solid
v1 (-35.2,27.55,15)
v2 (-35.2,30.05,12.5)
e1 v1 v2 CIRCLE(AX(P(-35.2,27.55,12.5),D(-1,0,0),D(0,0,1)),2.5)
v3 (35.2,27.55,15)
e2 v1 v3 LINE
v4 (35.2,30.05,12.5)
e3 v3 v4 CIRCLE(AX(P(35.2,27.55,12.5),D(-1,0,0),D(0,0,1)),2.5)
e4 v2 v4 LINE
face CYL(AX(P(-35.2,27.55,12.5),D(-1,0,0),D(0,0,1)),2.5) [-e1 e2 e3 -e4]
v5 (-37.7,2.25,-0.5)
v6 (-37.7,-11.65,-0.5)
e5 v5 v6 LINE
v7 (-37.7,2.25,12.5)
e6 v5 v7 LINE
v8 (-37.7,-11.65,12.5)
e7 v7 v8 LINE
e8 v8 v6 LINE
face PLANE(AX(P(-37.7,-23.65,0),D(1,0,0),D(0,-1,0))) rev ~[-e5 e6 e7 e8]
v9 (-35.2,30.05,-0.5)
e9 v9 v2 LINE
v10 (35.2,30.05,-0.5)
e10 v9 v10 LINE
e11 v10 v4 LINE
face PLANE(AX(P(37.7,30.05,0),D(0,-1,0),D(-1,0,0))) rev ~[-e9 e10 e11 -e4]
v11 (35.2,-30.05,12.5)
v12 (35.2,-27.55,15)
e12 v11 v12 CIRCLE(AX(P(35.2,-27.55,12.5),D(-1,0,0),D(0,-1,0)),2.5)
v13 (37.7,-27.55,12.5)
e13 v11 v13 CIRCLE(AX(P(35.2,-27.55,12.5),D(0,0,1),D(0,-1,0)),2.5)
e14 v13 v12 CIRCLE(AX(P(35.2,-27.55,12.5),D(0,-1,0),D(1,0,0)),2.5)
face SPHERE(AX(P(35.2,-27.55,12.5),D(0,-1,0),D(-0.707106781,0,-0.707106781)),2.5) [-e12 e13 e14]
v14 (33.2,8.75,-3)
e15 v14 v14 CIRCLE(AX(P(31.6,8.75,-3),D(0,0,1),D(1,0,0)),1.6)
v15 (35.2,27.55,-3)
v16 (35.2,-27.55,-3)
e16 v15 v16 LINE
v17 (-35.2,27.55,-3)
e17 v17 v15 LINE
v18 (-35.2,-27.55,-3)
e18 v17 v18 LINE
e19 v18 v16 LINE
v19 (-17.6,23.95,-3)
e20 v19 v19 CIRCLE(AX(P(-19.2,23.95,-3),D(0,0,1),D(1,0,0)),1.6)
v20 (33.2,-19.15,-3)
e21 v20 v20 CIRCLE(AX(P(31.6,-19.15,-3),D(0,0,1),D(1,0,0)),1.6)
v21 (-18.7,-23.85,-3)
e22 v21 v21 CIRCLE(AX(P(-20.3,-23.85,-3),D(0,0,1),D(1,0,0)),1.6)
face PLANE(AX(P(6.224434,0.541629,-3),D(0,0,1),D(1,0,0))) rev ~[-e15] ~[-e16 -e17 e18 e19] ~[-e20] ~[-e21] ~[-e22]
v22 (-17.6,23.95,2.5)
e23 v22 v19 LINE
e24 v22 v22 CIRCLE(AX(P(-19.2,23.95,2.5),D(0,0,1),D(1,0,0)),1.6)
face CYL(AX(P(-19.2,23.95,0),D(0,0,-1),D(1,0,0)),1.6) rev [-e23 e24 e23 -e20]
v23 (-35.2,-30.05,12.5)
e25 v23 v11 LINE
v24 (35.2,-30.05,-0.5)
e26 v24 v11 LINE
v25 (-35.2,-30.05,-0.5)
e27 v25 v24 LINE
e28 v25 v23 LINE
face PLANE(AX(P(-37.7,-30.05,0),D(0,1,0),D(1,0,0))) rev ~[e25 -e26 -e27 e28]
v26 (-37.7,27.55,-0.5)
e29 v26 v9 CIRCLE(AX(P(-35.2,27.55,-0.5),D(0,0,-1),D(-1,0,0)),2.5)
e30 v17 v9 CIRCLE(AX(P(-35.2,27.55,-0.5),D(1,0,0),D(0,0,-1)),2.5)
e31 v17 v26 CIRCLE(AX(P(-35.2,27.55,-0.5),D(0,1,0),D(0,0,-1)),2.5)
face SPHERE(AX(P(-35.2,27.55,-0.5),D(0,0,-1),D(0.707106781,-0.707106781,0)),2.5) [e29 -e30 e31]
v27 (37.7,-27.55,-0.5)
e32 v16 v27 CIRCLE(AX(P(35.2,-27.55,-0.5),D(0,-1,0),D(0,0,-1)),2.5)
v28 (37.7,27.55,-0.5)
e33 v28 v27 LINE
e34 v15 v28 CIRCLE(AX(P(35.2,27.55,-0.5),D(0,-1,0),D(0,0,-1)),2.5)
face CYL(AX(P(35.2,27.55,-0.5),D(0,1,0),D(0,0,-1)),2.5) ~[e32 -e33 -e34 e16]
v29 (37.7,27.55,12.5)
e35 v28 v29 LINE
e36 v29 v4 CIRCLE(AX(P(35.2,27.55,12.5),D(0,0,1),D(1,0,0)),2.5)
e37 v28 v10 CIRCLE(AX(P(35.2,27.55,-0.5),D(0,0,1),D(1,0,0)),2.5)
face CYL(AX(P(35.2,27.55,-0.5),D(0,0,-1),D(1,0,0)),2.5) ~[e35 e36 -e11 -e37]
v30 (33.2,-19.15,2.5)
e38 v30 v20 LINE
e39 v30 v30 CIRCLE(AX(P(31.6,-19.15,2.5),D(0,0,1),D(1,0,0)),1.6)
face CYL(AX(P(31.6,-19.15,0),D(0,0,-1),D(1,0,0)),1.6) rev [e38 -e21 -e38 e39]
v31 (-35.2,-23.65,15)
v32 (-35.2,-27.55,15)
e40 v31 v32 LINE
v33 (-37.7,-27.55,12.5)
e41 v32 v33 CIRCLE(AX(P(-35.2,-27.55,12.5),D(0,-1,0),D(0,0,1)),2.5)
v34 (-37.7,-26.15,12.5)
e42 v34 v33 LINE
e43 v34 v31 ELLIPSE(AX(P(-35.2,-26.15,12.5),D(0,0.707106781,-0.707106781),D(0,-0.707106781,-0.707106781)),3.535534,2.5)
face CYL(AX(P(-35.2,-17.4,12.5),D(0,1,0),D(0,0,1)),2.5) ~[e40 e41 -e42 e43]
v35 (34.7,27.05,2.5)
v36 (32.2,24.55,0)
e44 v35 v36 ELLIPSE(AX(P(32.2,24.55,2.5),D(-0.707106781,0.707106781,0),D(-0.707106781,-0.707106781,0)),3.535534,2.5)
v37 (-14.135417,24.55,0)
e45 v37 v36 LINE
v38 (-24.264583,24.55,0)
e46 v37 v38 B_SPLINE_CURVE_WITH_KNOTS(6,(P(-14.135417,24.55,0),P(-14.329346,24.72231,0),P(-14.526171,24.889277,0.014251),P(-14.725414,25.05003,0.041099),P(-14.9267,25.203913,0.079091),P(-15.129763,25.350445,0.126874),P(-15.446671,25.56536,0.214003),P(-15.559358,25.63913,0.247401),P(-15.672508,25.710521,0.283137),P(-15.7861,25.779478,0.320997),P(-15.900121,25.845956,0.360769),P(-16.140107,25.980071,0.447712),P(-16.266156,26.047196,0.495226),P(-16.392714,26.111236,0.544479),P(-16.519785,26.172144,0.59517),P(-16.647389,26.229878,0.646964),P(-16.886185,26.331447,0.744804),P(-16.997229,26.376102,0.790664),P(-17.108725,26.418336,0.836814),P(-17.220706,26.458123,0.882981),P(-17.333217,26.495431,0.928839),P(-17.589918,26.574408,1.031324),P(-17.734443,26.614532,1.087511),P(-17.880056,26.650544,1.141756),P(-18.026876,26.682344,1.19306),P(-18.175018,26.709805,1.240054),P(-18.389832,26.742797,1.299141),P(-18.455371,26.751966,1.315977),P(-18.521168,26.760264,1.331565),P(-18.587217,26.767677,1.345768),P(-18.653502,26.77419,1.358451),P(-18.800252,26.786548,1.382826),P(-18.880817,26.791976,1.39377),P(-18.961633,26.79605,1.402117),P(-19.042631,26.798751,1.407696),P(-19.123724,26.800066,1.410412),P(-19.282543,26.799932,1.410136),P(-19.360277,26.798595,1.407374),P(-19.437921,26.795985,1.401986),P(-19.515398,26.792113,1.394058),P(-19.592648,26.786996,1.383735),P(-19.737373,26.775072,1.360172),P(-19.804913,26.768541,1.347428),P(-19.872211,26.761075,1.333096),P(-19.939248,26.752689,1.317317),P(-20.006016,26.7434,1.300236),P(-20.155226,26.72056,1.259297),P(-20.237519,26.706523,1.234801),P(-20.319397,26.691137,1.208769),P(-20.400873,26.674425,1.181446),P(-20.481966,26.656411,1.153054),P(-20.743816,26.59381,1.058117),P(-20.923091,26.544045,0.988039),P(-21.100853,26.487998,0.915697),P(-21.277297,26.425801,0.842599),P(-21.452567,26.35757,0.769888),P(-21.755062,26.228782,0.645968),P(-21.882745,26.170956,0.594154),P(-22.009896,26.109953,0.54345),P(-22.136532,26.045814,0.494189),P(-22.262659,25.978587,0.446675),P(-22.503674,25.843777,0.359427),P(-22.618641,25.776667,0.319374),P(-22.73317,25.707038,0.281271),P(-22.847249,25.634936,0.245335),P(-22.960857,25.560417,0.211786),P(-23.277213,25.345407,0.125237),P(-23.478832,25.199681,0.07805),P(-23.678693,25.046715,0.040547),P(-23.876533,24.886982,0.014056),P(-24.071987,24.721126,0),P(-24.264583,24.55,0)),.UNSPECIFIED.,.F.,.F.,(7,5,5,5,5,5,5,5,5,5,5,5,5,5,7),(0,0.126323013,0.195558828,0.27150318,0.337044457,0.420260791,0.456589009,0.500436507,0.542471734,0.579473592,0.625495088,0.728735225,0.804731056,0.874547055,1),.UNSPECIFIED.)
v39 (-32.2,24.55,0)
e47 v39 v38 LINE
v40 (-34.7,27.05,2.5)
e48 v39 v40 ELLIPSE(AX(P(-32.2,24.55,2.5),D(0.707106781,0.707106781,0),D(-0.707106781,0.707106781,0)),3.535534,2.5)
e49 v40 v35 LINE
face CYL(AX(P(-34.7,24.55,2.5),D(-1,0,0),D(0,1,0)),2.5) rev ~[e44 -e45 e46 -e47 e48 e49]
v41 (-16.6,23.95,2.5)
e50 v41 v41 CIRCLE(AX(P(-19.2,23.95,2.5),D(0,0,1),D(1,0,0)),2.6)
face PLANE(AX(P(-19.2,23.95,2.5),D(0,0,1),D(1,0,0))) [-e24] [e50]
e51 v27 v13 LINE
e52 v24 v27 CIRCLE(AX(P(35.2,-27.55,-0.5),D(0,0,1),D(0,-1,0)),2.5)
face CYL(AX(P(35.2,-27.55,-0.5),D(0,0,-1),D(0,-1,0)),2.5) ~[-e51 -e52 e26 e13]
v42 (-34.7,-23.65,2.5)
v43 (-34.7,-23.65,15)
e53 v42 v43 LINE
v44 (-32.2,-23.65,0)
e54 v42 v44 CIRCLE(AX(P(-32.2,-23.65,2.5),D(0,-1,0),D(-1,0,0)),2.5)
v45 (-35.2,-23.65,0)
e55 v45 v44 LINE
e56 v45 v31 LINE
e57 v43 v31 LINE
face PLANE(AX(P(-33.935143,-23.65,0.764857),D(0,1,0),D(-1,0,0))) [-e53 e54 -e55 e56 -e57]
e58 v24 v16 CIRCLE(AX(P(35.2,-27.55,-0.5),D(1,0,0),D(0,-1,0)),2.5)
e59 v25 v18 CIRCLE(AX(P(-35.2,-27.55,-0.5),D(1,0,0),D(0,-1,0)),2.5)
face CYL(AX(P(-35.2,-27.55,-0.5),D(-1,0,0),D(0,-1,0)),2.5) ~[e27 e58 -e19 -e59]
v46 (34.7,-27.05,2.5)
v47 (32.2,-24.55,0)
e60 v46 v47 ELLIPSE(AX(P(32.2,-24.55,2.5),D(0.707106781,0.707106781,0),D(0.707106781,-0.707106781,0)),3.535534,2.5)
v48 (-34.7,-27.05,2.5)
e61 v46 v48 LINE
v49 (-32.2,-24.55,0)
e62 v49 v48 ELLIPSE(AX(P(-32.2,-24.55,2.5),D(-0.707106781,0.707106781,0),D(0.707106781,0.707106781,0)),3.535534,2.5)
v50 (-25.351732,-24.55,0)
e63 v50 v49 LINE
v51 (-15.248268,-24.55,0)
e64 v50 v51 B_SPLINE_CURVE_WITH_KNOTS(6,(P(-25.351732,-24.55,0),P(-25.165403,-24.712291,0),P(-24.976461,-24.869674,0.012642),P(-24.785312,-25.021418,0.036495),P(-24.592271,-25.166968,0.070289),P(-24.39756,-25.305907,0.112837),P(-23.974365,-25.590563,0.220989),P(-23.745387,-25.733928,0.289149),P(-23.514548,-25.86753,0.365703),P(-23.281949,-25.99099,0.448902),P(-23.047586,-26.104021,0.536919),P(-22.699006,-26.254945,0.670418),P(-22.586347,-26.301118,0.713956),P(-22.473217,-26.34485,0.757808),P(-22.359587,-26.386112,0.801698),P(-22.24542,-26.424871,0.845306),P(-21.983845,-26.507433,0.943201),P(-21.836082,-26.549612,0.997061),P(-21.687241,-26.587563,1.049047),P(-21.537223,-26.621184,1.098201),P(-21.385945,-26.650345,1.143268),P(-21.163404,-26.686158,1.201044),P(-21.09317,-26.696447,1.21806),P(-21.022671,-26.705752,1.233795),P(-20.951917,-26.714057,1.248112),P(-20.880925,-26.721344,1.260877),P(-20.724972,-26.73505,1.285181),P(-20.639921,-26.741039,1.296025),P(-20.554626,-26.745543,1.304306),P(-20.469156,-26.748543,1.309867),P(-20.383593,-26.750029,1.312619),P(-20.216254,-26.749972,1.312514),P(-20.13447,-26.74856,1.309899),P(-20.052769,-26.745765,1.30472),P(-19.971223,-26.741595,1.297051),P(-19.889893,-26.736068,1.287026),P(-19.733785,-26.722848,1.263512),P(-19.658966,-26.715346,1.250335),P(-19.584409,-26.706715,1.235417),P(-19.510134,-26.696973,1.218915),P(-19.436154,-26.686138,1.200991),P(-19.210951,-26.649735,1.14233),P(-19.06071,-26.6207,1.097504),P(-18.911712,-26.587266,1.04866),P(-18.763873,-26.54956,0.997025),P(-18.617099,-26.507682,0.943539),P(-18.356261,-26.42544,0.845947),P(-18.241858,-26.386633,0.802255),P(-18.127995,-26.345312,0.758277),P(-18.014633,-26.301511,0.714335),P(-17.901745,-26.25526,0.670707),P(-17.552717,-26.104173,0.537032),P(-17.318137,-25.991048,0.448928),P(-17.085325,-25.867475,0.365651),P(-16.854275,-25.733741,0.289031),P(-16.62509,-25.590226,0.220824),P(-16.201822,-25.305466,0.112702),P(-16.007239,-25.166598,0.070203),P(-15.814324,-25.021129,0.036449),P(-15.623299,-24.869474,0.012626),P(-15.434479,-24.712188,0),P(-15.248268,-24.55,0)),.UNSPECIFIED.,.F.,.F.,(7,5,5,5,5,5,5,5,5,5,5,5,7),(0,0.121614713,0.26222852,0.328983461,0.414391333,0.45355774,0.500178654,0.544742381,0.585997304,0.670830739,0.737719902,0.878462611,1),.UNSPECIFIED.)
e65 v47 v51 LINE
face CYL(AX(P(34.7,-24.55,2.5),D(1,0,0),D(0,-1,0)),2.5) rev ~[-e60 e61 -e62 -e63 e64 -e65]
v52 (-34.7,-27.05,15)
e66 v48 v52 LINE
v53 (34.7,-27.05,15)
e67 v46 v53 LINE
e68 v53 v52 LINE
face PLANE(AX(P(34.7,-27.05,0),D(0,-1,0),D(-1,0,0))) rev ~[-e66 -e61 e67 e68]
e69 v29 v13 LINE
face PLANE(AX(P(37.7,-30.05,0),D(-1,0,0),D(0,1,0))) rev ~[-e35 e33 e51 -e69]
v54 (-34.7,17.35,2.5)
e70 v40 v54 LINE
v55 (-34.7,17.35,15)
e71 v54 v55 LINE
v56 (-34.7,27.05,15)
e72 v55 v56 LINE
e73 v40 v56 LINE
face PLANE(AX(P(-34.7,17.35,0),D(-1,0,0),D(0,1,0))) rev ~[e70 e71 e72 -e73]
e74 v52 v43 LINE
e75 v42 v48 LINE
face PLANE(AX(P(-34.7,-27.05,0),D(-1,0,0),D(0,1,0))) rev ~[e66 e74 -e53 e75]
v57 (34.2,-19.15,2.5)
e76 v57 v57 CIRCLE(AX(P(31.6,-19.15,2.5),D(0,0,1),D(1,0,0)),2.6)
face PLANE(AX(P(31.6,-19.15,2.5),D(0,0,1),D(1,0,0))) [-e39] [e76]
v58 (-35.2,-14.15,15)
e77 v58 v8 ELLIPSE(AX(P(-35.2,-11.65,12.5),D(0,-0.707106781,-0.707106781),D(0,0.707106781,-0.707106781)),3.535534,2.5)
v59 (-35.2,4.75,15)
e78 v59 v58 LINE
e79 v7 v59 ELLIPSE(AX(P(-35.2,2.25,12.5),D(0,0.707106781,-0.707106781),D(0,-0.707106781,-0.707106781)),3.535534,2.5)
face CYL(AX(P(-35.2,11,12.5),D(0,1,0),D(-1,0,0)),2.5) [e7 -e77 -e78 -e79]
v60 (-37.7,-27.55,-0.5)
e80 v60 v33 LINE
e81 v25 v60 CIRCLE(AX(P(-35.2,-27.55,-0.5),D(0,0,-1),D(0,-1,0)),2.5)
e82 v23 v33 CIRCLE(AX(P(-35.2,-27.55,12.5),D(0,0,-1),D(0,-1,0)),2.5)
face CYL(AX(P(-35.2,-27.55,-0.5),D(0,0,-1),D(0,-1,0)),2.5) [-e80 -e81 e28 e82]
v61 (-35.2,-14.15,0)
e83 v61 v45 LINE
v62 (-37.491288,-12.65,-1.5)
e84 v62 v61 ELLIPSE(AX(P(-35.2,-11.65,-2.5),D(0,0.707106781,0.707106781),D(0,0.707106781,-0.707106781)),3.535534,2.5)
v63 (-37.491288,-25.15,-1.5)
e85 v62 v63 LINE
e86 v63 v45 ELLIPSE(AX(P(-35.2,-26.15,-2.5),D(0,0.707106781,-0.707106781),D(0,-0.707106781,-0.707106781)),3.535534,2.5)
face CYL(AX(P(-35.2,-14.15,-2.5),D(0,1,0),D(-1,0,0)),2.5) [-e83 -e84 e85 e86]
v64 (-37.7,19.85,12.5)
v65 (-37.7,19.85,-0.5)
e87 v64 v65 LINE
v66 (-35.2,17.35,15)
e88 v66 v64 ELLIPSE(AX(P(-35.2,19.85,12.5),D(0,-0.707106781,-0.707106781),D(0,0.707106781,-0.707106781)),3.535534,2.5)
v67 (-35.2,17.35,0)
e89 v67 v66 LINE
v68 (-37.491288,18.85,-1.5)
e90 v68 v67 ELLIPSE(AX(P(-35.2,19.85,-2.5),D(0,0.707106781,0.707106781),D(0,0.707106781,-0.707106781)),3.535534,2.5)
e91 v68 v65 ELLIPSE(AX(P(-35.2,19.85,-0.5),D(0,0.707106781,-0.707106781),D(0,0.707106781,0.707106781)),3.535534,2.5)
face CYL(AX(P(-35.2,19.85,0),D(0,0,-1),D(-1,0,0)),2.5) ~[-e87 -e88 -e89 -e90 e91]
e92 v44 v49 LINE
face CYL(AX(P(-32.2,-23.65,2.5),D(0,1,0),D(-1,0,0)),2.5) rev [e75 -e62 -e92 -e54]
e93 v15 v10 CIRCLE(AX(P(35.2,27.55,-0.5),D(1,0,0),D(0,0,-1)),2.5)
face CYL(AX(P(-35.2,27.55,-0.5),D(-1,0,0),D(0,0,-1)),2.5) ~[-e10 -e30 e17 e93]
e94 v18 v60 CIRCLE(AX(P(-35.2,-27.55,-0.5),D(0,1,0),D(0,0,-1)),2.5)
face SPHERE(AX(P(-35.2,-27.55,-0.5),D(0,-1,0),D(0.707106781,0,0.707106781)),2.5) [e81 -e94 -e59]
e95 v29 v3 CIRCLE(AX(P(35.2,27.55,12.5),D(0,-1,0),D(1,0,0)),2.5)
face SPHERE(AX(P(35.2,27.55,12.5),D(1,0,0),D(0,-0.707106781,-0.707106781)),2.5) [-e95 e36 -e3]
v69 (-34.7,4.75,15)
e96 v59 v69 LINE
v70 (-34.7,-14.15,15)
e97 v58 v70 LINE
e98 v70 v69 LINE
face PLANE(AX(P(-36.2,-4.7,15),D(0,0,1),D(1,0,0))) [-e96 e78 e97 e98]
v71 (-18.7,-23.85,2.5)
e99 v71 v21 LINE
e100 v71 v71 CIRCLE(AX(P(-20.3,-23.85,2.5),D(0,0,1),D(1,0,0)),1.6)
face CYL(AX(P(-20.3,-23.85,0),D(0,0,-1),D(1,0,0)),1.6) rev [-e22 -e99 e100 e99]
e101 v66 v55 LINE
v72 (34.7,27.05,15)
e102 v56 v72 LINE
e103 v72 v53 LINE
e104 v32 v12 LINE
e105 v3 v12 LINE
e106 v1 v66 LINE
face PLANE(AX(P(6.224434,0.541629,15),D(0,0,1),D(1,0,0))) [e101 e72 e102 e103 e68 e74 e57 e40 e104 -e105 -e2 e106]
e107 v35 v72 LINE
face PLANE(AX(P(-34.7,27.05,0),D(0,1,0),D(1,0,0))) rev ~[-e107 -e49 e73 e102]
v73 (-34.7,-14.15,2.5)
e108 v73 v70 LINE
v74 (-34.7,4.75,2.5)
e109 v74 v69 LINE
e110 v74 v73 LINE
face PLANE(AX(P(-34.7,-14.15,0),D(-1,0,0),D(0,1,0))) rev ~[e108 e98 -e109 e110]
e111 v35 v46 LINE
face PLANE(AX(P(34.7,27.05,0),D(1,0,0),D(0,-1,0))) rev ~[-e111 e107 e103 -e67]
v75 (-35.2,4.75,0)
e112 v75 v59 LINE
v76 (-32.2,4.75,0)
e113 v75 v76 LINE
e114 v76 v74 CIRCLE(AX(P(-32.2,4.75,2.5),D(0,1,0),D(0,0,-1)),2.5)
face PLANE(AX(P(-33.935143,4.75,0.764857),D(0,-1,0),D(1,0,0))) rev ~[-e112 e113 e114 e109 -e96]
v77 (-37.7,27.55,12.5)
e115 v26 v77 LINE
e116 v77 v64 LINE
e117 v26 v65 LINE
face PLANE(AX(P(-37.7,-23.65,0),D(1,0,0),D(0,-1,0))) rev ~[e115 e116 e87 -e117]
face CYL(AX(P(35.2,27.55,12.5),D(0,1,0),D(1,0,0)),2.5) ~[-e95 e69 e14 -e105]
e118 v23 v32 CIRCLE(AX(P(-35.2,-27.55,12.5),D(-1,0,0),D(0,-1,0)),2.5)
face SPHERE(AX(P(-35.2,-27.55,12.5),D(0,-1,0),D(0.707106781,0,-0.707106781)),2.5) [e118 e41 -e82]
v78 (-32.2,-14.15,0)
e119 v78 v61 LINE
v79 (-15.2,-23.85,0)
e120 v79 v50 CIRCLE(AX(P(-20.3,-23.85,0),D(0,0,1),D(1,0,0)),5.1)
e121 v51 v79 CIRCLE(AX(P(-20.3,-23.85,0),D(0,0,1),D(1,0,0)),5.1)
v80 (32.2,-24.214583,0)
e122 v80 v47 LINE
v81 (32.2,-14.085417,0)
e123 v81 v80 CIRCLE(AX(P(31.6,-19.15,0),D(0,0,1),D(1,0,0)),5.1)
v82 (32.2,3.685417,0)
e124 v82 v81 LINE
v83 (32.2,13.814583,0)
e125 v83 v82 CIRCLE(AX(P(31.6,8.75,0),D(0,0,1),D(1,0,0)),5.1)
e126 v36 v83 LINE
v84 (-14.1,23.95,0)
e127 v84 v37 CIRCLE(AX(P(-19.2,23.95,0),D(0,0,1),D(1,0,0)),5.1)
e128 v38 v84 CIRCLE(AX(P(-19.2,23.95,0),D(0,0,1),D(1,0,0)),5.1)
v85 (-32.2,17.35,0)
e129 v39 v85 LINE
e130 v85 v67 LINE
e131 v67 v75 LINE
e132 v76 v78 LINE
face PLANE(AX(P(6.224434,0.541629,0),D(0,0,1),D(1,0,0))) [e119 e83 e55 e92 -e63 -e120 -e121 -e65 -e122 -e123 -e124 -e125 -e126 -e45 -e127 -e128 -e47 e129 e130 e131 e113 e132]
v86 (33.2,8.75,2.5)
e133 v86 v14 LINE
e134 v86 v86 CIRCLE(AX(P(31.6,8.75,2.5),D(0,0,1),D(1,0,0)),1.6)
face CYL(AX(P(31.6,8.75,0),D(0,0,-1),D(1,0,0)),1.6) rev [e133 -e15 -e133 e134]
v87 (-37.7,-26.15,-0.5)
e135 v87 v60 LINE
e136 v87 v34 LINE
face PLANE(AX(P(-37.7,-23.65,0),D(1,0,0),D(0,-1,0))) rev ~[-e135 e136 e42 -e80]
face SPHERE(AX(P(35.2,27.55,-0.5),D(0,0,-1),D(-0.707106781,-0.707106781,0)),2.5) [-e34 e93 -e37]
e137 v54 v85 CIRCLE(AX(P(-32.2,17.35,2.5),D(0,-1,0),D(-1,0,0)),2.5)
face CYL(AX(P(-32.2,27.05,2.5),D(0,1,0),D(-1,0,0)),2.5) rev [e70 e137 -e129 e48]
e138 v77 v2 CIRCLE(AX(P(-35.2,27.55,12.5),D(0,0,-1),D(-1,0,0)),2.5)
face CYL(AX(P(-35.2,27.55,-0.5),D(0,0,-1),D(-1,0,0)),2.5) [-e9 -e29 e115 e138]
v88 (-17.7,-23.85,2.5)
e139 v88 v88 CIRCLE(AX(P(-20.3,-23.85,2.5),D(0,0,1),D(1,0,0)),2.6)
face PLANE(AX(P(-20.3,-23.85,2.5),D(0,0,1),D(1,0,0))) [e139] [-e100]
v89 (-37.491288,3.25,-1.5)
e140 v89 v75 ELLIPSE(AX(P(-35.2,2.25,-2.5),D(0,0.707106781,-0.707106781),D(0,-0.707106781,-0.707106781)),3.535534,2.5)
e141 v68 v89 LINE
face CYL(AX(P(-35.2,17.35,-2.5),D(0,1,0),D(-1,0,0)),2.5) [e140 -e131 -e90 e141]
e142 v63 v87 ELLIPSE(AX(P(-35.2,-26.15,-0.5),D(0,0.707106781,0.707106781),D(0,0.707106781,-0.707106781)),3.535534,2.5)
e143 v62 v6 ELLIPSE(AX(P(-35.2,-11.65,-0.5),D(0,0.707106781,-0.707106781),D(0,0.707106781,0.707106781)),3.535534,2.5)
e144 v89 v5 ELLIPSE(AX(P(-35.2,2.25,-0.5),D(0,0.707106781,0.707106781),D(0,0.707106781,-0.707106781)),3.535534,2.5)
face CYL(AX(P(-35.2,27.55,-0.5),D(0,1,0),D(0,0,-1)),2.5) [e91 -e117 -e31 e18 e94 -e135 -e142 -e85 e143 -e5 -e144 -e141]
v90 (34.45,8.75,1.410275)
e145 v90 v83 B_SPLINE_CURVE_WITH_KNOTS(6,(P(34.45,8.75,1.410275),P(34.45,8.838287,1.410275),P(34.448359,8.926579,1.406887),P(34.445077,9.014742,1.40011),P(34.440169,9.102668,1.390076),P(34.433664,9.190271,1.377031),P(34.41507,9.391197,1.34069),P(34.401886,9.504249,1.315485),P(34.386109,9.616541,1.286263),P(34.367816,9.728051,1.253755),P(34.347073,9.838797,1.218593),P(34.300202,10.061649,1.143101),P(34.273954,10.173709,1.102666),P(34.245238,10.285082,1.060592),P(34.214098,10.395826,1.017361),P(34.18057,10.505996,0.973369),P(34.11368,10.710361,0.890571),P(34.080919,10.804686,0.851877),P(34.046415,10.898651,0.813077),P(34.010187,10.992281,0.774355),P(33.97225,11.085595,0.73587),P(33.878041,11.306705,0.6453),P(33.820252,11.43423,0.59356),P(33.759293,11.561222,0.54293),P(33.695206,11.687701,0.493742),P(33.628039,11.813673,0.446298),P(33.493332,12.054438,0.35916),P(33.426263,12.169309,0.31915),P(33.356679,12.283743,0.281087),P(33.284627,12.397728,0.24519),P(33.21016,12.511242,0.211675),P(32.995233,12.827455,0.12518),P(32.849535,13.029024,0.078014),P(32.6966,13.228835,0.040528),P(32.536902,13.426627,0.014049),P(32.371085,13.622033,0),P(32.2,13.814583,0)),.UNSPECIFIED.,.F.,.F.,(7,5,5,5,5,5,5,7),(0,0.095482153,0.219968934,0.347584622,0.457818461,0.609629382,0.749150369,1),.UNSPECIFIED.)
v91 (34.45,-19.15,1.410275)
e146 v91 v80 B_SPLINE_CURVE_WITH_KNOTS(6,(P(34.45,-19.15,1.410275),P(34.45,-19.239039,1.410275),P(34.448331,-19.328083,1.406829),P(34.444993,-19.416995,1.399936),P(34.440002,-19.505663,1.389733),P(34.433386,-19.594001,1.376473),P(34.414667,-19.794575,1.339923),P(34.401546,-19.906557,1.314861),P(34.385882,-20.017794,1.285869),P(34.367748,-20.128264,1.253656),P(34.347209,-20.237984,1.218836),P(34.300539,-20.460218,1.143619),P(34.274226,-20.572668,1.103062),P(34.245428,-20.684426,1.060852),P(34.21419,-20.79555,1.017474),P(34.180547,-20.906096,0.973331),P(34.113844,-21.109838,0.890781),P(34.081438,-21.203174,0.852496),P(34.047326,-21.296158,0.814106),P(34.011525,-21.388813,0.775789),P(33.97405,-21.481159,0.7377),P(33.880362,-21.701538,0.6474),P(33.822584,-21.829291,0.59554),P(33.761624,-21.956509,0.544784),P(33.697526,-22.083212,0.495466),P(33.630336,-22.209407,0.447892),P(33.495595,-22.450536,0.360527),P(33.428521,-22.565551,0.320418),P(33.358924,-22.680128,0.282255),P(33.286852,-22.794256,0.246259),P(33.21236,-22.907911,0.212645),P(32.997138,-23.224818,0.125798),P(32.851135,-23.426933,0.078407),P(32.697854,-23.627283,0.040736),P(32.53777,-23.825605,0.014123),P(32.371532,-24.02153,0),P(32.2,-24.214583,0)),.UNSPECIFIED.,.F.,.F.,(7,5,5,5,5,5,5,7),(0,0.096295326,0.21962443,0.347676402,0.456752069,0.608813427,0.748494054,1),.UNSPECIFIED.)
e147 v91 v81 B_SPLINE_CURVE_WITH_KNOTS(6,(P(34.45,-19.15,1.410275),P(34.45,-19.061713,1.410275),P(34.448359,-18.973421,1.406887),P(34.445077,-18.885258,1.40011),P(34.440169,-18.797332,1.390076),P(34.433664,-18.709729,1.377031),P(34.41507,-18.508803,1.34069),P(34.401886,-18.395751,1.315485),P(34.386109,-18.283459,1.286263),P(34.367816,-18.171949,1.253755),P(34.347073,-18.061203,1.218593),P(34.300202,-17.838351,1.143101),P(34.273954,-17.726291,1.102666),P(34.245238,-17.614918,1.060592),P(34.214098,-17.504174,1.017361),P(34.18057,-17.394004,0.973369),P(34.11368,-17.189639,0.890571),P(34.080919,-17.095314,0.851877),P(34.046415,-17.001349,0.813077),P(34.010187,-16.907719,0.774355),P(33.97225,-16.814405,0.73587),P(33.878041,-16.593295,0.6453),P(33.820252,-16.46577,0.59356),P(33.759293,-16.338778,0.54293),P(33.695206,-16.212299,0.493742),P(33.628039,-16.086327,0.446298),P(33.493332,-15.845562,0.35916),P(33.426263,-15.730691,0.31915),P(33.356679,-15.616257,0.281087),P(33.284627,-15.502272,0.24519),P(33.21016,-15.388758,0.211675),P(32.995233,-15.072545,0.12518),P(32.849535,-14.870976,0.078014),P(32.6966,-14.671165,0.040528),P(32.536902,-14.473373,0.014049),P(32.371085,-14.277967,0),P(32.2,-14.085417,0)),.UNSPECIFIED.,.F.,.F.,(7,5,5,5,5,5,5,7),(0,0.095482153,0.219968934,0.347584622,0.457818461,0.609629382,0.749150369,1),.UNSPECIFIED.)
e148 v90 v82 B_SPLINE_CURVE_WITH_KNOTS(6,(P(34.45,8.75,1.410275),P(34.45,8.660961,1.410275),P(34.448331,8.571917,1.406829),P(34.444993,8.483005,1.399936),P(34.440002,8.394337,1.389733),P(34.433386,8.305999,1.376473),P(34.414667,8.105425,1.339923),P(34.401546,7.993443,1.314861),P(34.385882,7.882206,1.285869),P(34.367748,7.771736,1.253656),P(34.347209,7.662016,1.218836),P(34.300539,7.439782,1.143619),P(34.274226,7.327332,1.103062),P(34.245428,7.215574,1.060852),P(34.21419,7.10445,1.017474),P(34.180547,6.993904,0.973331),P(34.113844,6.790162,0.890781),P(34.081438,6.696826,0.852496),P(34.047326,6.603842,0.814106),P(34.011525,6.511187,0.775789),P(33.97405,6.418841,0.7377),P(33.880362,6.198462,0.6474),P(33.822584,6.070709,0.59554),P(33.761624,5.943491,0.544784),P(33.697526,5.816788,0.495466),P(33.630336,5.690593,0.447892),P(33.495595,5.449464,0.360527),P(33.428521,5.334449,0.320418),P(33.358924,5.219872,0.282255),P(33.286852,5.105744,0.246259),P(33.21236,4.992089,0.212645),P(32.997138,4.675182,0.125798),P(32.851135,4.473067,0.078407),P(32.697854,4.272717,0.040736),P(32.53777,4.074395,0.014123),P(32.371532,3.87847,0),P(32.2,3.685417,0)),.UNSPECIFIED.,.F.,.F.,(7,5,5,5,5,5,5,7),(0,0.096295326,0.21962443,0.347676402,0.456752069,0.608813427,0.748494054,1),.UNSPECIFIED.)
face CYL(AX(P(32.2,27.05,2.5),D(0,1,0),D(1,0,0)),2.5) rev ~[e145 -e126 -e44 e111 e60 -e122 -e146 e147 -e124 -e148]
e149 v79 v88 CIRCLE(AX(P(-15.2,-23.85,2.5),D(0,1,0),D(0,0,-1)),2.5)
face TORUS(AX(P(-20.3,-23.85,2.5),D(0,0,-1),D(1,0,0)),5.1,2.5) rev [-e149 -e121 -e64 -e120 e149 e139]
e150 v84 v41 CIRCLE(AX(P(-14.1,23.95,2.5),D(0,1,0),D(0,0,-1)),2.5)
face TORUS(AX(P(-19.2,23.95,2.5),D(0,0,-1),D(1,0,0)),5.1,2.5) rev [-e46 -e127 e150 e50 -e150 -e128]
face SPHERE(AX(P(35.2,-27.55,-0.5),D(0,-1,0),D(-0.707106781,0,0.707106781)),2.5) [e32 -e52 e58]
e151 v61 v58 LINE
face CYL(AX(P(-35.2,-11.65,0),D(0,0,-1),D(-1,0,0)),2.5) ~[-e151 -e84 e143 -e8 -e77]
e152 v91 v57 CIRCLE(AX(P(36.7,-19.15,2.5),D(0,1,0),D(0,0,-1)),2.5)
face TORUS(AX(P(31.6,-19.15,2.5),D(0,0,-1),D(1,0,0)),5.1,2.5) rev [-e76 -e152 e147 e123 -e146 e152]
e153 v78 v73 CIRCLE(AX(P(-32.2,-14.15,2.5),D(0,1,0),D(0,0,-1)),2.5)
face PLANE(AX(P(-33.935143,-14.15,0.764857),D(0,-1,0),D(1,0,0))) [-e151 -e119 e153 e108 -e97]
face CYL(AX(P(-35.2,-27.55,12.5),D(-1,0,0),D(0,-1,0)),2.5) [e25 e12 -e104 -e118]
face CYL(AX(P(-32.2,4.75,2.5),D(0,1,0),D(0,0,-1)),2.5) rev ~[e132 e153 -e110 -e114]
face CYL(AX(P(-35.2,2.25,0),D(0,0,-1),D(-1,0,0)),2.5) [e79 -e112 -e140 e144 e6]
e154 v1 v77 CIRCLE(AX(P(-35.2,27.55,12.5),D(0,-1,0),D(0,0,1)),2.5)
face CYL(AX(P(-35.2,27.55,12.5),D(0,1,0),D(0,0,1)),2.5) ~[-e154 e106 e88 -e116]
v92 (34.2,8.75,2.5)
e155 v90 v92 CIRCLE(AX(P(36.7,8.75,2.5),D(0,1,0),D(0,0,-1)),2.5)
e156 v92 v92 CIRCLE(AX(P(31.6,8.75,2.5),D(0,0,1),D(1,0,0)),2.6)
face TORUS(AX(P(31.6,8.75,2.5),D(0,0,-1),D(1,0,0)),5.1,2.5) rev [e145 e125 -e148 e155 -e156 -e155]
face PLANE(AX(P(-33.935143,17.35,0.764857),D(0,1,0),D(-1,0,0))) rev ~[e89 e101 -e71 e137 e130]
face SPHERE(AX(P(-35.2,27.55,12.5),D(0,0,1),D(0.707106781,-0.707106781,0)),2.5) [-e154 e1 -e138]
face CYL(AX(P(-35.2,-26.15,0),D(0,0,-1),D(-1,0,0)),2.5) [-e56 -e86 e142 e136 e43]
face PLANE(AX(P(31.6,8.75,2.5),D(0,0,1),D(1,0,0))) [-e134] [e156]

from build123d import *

# Parameters (mm, degrees)
F0_W          = 0.4
F0_H          = 0.3
F0_H_2        = 8.9
F0_W_2        = 9.5
F0_R          = 2.6
F0_W_3        = 10.3
F0_H_3        = 12
F0_W_4        = 3
F0_R_2        = 1.6
F0_H_4        = 18.9
F1_DEPTH      = 3
F2_DEPTH      = 15
F3_DEPTH      = 2.5
F4_T1_DEPTH   = 9.7
F4_T3_DEPTH   = 18.9
F4_T5_DEPTH   = 3.4
F4_T10_DEPTH  = 69.4
F4_S11_R      = 2.6
F4_T12_DEPTH  = 36
F4_T16_DEPTH  = 69.4
F4_S17_R      = 2.6
F4_T18_DEPTH  = 36
F4_T22_DEPTH  = 54.1
F4_S23_R      = 2.6
F4_T24_DEPTH  = 29
F4_S25_R      = 2.6
F4_T26_DEPTH  = 29
F4_T35_DEPTH  = 13
F4_T37_DEPTH  = 21.25
F4_T39_DEPTH  = 12.6
F4_T41_DEPTH  = 9.5
F4_T43_DEPTH  = 55.1
F4_T45_DEPTH  = 70.4
F4_T47_DEPTH  = 31.4
F4_T49_DEPTH  = 16.45
F4_T51_DEPTH  = 10.15
F4_S55_W      = 2.55
F4_S55_H      = 2.55
F4_T56_DEPTH  = 2.55
F4_S61_W      = 2.55
F4_S61_H      = 2.55
F4_T62_DEPTH  = 2.55
F4_S67_W      = 2.55
F4_S67_H      = 2.55
F4_T68_DEPTH  = 2.55
F4_S73_W      = 2.55
F4_S73_H      = 2.55
F4_T74_DEPTH  = 2.55
F4_S79_W      = 2.55
F4_S79_H      = 2.55
F4_T80_DEPTH  = 2.55
F4_S85_W      = 2.55
F4_S85_H      = 2.55
F4_T86_DEPTH  = 2.55
F4_S91_W      = 2.55
F4_S91_H      = 2.55
F4_T92_DEPTH  = 2.55
F4_S97_W      = 2.55
F4_S97_H      = 2.55
F4_T98_DEPTH  = 2.55
F4_T105_DEPTH = 15.75
F4_T109_DEPTH = 21.25
F4_T117_DEPTH = 18.85
F4_T121_DEPTH = 21.25
F4_T129_DEPTH = 21.25
F4_T134_DEPTH = 18.85
F4_T141_DEPTH = 21.25
F4_T146_DEPTH = 15.75


# Not quite as in the source:
# - a fillet or chamfer that OpenCascade refuses, or shapes differently, is made with other operations: its cross-section is extruded or revolved along the edge and cut away or added


with BuildPart() as f1:
    # F0 (on Top) → F1 (new body)
    with BuildSketch(Plane.XY):
        Polygon((-34.7, -27.05), (-34.7, -23.65), (-37.7, -23.65), (-37.7, -30.05), (37.7, -30.05), (37.7, 30.05), (-37.7, 30.05), (-37.7, 17.35), (-34.7, 17.35), (-34.7, 27.05), (34.7, 27.05), (34.7, -27.05), align=None)
        with Locations((-34.5, -14.3)):
            Rectangle(F0_W, F0_H)
        with Locations((-34.5, -18.9)):
            Rectangle(F0_W, F0_H_2)
        with Locations((-29.55, -18.9)):
            Rectangle(F0_W_2, F0_H_2)
        Polygon((-34.3, -26.65), (34.3, -26.65), (34.3, 26.65), (-34.3, 26.65), (-34.3, 17.35), (-23.7, 17.35), (-23.7, 4.75), (-34.3, 4.75), (-34.3, -14.15), (-24.5, -14.15), (-24.5, -23.65), (-34.3, -23.65), align=None)
        with Locations((-20.3, -23.85)):
            Circle(F0_R, mode=Mode.SUBTRACT)
        with Locations((31.6, -19.15)):
            Circle(F0_R, mode=Mode.SUBTRACT)
        with Locations((-19.2, 23.95)):
            Circle(F0_R, mode=Mode.SUBTRACT)
        with Locations((31.6, 8.75)):
            Circle(F0_R, mode=Mode.SUBTRACT)
        Polygon((34.3, 26.65), (34.3, -26.65), (-34.3, -26.65), (-34.3, -23.65), (-34.7, -23.65), (-34.7, -27.05), (34.7, -27.05), (34.7, 27.05), (-34.7, 27.05), (-34.7, 17.35), (-34.3, 17.35), (-34.3, 26.65), align=None)
        with Locations((-29.15, 11.05)):
            Rectangle(F0_W_3, F0_H_3)
        with Locations((-36.2, 11.05)):
            Rectangle(F0_W_4, F0_H_3)
        with Locations((-34.5, 11.05)):
            Rectangle(F0_W, F0_H_3)
        with Locations((-36.2, -18.9)):
            Rectangle(F0_W_4, F0_H_2)
        with Locations((-36.2, -14.3)):
            Rectangle(F0_W_4, F0_H)
        with Locations((-19.2, 23.95)):
            Circle(F0_R)
        with Locations((-19.2, 23.95)):
            Circle(F0_R_2, mode=Mode.SUBTRACT)
        with Locations((-20.3, -23.85)):
            Circle(F0_R)
        with Locations((-20.3, -23.85)):
            Circle(F0_R_2, mode=Mode.SUBTRACT)
        with Locations((31.6, -19.15)):
            Circle(F0_R)
        with Locations((31.6, -19.15)):
            Circle(F0_R_2, mode=Mode.SUBTRACT)
        with Locations((31.6, 8.75)):
            Circle(F0_R)
        with Locations((31.6, 8.75)):
            Circle(F0_R_2, mode=Mode.SUBTRACT)
        with Locations((-36.2, 4.9)):
            Rectangle(F0_W_4, F0_H)
        with Locations((-34.5, 4.9)):
            Rectangle(F0_W, F0_H)
        Polygon((-23.7, 17.35), (-34.3, 17.35), (-34.3, 17.05), (-24, 17.05), (-24, 5.05), (-34.3, 5.05), (-34.3, 4.75), (-23.7, 4.75), align=None)
        with Locations((-34.5, -4.7)):
            Rectangle(F0_W, F0_H_4)
        with Locations((-36.2, -4.7)):
            Rectangle(F0_W_4, F0_H_4)
        Polygon((-34.3, -23.35), (-34.3, -23.65), (-24.5, -23.65), (-24.5, -14.15), (-34.3, -14.15), (-34.3, -14.45), (-24.8, -14.45), (-24.8, -23.35), align=None)
        with Locations((-36.2, 17.2)):
            Rectangle(F0_W_4, F0_H)
        with Locations((-34.5, 17.2)):
            Rectangle(F0_W, F0_H)
        with Locations((-34.5, -23.5)):
            Rectangle(F0_W, F0_H)
        with Locations((-36.2, -23.5)):
            Rectangle(F0_W_4, F0_H)
    extrude(amount=-F1_DEPTH)

    # F0 (on Top) → F2 (join)
    with BuildSketch(Plane.XY):
        Polygon((-34.7, -27.05), (-34.7, -23.65), (-37.7, -23.65), (-37.7, -30.05), (37.7, -30.05), (37.7, 30.05), (-37.7, 30.05), (-37.7, 17.35), (-34.7, 17.35), (-34.7, 27.05), (34.7, 27.05), (34.7, -27.05), align=None)
        with Locations((-36.2, -4.7)):
            Rectangle(F0_W_4, F0_H_4)
    extrude(amount=F2_DEPTH)

    # F0 (on Top) → F3 (join)
    with BuildSketch(Plane.XY):
        with Locations((-20.3, -23.85)):
            Circle(F0_R)
        with Locations((-20.3, -23.85)):
            Circle(F0_R_2, mode=Mode.SUBTRACT)
        with Locations((-19.2, 23.95)):
            Circle(F0_R)
        with Locations((-19.2, 23.95)):
            Circle(F0_R_2, mode=Mode.SUBTRACT)
        with Locations((31.6, 8.75)):
            Circle(F0_R)
        with Locations((31.6, 8.75)):
            Circle(F0_R_2, mode=Mode.SUBTRACT)
        with Locations((31.6, -19.15)):
            Circle(F0_R)
        with Locations((31.6, -19.15)):
            Circle(F0_R_2, mode=Mode.SUBTRACT)
    extrude(amount=F3_DEPTH)

    # F4: fillet of radius 2.5 on 30 edges, made by hand

    # F4_s2 → F4_t1 (join)
    with BuildSketch(Plane.XZ.offset(-27.05)):
        with BuildLine():
            ThreePointArc((-34.7, 2.5), (-33.967766953, 0.732233047), (-32.2, 0))
            Line((-32.2, 0), (-34.7, 0))
            Line((-34.7, 0), (-34.7, 2.5))
        make_face()
    extrude(amount=F4_T1_DEPTH)

    # F4_s4 → F4_t3 (join)
    with BuildSketch(Plane.XZ.offset(-4.75)):
        with BuildLine():
            ThreePointArc((-32.2, 0), (-33.967766953, 0.732233047), (-34.7, 2.5))
            Line((-34.7, 2.5), (-34.7, 0))
            Line((-34.7, 0), (-32.2, 0))
        make_face()
    extrude(amount=F4_T3_DEPTH)

    # F4_s6 → F4_t5 (join)
    with BuildSketch(Plane.XZ.offset(23.65)):
        with BuildLine():
            ThreePointArc((-34.7, 2.5), (-33.967766953, 0.732233047), (-32.2, 0))
            Line((-32.2, 0), (-34.7, 0))
            Line((-34.7, 0), (-34.7, 2.5))
        make_face()
    extrude(amount=F4_T5_DEPTH)


with BuildPart() as f4_tool8:
    # F4_s9 → F4_t10 (new body)
    with BuildSketch(Plane.YZ.offset(-34.7)):
        with BuildLine():
            ThreePointArc((27.05, 2.5), (26.317766953, 0.732233047), (24.55, 0))
            Line((24.55, 0), (27.05, 0))
            Line((27.05, 0), (27.05, 2.5))
        make_face()
    extrude(amount=F4_T10_DEPTH)

    # F4_s11 → F4_t12 (cut, symmetric)
    with BuildSketch(Plane.XY.offset(1.2)):
        with Locations((-19.2, 23.95)):
            Circle(F4_S11_R)
    extrude(amount=F4_T12_DEPTH, both=True, mode=Mode.SUBTRACT)


with BuildPart() as f1_1:
    add(f1.part)

    # F4_t7: union F4_tool8
    add(f4_tool8.part)


with BuildPart() as f4_tool14:
    # F4_s15 → F4_t16 (new body)
    with BuildSketch(Plane.YZ.offset(34.7)):
        with BuildLine():
            ThreePointArc((-27.05, 2.5), (-26.317766953, 0.732233047), (-24.55, 0))
            Line((-24.55, 0), (-27.05, 0))
            Line((-27.05, 0), (-27.05, 2.5))
        make_face()
    extrude(amount=-F4_T16_DEPTH)

    # F4_s17 → F4_t18 (cut, symmetric)
    with BuildSketch(Plane.XY.offset(1.2)):
        with Locations((-20.3, -23.85)):
            Circle(F4_S17_R)
    extrude(amount=F4_T18_DEPTH, both=True, mode=Mode.SUBTRACT)


with BuildPart() as f1_2:
    add(f1_1.part)

    # F4_t13: union F4_tool14
    add(f4_tool14.part)


with BuildPart() as f4_tool20:
    # F4_s21 → F4_t22 (new body)
    with BuildSketch(Plane.XZ.offset(-27.05)):
        with BuildLine():
            ThreePointArc((34.7, 2.5), (33.967766953, 0.732233047), (32.2, 0))
            Line((32.2, 0), (34.7, 0))
            Line((34.7, 0), (34.7, 2.5))
        make_face()
    extrude(amount=F4_T22_DEPTH)

    # F4_s23 → F4_t24 (cut, symmetric)
    with BuildSketch(Plane.XY.offset(1.2)):
        with Locations((31.6, -19.15)):
            Circle(F4_S23_R)
    extrude(amount=F4_T24_DEPTH, both=True, mode=Mode.SUBTRACT)

    # F4_s25 → F4_t26 (cut, symmetric)
    with BuildSketch(Plane.XY.offset(1.2)):
        with Locations((31.6, 8.75)):
            Circle(F4_S25_R)
    extrude(amount=F4_T26_DEPTH, both=True, mode=Mode.SUBTRACT)


with BuildPart() as f1_3:
    add(f1_2.part)

    # F4_t19: union F4_tool20
    add(f4_tool20.part)

    # F4_s27 → F4_t28 (revolve)
    with BuildSketch(Plane.XZ.offset(-8.75)):
        with BuildLine():
            ThreePointArc((36.7, 0), (34.932233047, 0.732233047), (34.2, 2.5))
            Line((34.2, 2.5), (34.2, 0))
            Line((34.2, 0), (36.7, 0))
        make_face()
    revolve(axis=Axis((31.6, 8.75, 0), (0, 0, 1)))

    # F4_s29 → F4_t30 (revolve)
    with BuildSketch(Plane.XZ.offset(19.15)):
        with BuildLine():
            ThreePointArc((36.7, 0), (34.932233047, 0.732233047), (34.2, 2.5))
            Line((34.2, 2.5), (34.2, 0))
            Line((34.2, 0), (36.7, 0))
        make_face()
    revolve(axis=Axis((31.6, -19.15, 0), (0, 0, 1)))

    # F4_s31 → F4_t32 (revolve)
    with BuildSketch(Plane.XZ.offset(23.85)):
        with BuildLine():
            ThreePointArc((-15.2, 0), (-16.967766953, 0.732233047), (-17.7, 2.5))
            Line((-17.7, 2.5), (-17.7, 0))
            Line((-17.7, 0), (-15.2, 0))
        make_face()
    revolve(axis=Axis((-20.3, -23.85, 0), (0, 0, 1)))

    # F4_s33 → F4_t34 (revolve)
    with BuildSketch(Plane.XZ.offset(-23.95)):
        with BuildLine():
            ThreePointArc((-14.1, 0), (-15.867766953, 0.732233047), (-16.6, 2.5))
            Line((-16.6, 2.5), (-16.6, 0))
            Line((-16.6, 0), (-14.1, 0))
        make_face()
    revolve(axis=Axis((-19.2, 23.95, 0), (0, 0, 1)))

    # F4_s36 → F4_t35 (cut)
    with BuildSketch(Plane.XY.offset(-0.5)):
        with BuildLine():
            ThreePointArc((35.2, -30.05), (36.967766953, -29.317766953), (37.7, -27.55))
            Line((37.7, -27.55), (37.7, -30.05))
            Line((37.7, -30.05), (35.2, -30.05))
        make_face()
        with BuildLine():
            ThreePointArc((37.7, 27.55), (36.967766953, 29.317766953), (35.2, 30.05))
            Line((35.2, 30.05), (37.7, 30.05))
            Line((37.7, 30.05), (37.7, 27.55))
        make_face()
        with BuildLine():
            ThreePointArc((-37.7, 27.55), (-36.967766953, 29.317766953), (-35.2, 30.05))
            Line((-35.2, 30.05), (-37.7, 30.05))
            Line((-37.7, 30.05), (-37.7, 27.55))
        make_face()
        with BuildLine():
            ThreePointArc((-35.2, -30.05), (-36.967766953, -29.317766953), (-37.7, -27.55))
            Line((-37.7, -27.55), (-37.7, -30.05))
            Line((-37.7, -30.05), (-35.2, -30.05))
        make_face()
    extrude(amount=F4_T35_DEPTH, mode=Mode.SUBTRACT)

    # F4_s38 → F4_t37 (cut)
    with BuildSketch(Plane.XY):
        with BuildLine():
            ThreePointArc((-37.7, -11.65), (-36.967766953, -13.417766953), (-35.2, -14.15))
            Line((-35.2, -14.15), (-37.7, -14.15))
            Line((-37.7, -14.15), (-37.7, -11.65))
        make_face()
        with BuildLine():
            ThreePointArc((-37.7, 19.85), (-36.967766953, 18.082233047), (-35.2, 17.35))
            Line((-35.2, 17.35), (-37.7, 17.35))
            Line((-37.7, 17.35), (-37.7, 19.85))
        make_face()
        with BuildLine():
            ThreePointArc((-37.7, 2.25), (-36.967766953, 4.017766953), (-35.2, 4.75))
            Line((-35.2, 4.75), (-37.7, 4.75))
            Line((-37.7, 4.75), (-37.7, 2.25))
        make_face()
        with BuildLine():
            ThreePointArc((-37.7, -26.15), (-36.967766953, -24.382233047), (-35.2, -23.65))
            Line((-35.2, -23.65), (-37.7, -23.65))
            Line((-37.7, -23.65), (-37.7, -26.15))
        make_face()
    extrude(amount=F4_T37_DEPTH, mode=Mode.SUBTRACT)

    # F4_s40 → F4_t39 (cut)
    with BuildSketch(Plane.XZ.offset(-17.35)):
        with BuildLine():
            ThreePointArc((-37.7, -2.5), (-36.967766953, -0.732233047), (-35.2, 0))
            Line((-35.2, 0), (-37.7, 0))
            Line((-37.7, 0), (-37.7, -2.5))
        make_face()
    extrude(amount=F4_T39_DEPTH, mode=Mode.SUBTRACT)

    # F4_s42 → F4_t41 (cut)
    with BuildSketch(Plane.XZ.offset(14.15)):
        with BuildLine():
            ThreePointArc((-37.7, -2.5), (-36.967766953, -0.732233047), (-35.2, 0))
            Line((-35.2, 0), (-37.7, 0))
            Line((-37.7, 0), (-37.7, -2.5))
        make_face()
    extrude(amount=F4_T41_DEPTH, mode=Mode.SUBTRACT)

    # F4_s44 → F4_t43 (cut)
    with BuildSketch(Plane.XZ.offset(-27.55)):
        with BuildLine():
            ThreePointArc((35.2, -3), (36.967766953, -2.267766953), (37.7, -0.5))
            Line((37.7, -0.5), (37.7, -3))
            Line((37.7, -3), (35.2, -3))
        make_face()
        with BuildLine():
            ThreePointArc((-35.2, -3), (-36.967766953, -2.267766953), (-37.7, -0.5))
            Line((-37.7, -0.5), (-37.7, -3))
            Line((-37.7, -3), (-35.2, -3))
        make_face()
        with BuildLine():
            ThreePointArc((37.7, 12.5), (36.967766953, 14.267766953), (35.2, 15))
            Line((35.2, 15), (37.7, 15))
            Line((37.7, 15), (37.7, 12.5))
        make_face()
    extrude(amount=F4_T43_DEPTH, mode=Mode.SUBTRACT)

    # F4_s46 → F4_t45 (cut)
    with BuildSketch(Plane.YZ.offset(-35.2)):
        with BuildLine():
            ThreePointArc((27.55, -3), (29.317766953, -2.267766953), (30.05, -0.5))
            Line((30.05, -0.5), (30.05, -3))
            Line((30.05, -3), (27.55, -3))
        make_face()
        with BuildLine():
            ThreePointArc((-30.05, -0.5), (-29.317766953, -2.267766953), (-27.55, -3))
            Line((-27.55, -3), (-30.05, -3))
            Line((-30.05, -3), (-30.05, -0.5))
        make_face()
        with BuildLine():
            ThreePointArc((27.55, 15), (29.317766953, 14.267766953), (30.05, 12.5))
            Line((30.05, 12.5), (30.05, 15))
            Line((30.05, 15), (27.55, 15))
        make_face()
        with BuildLine():
            ThreePointArc((-30.05, 12.5), (-29.317766953, 14.267766953), (-27.55, 15))
            Line((-27.55, 15), (-30.05, 15))
            Line((-30.05, 15), (-30.05, 12.5))
        make_face()
    extrude(amount=F4_T45_DEPTH, mode=Mode.SUBTRACT)

    # F4_s48 → F4_t47 (cut)
    with BuildSketch(Plane.XZ.offset(-11)):
        with BuildLine():
            ThreePointArc((-37.7, 12.5), (-36.967766953, 14.267766953), (-35.2, 15))
            Line((-35.2, 15), (-37.7, 15))
            Line((-37.7, 15), (-37.7, 12.5))
        make_face()
    extrude(amount=F4_T47_DEPTH, mode=Mode.SUBTRACT)

    # F4_s50 → F4_t49 (cut)
    with BuildSketch(Plane.XZ.offset(-27.55)):
        with BuildLine():
            ThreePointArc((-35.2, 15), (-36.967766953, 14.267766953), (-37.7, 12.5))
            Line((-37.7, 12.5), (-37.7, 15))
            Line((-37.7, 15), (-35.2, 15))
        make_face()
    extrude(amount=F4_T49_DEPTH, mode=Mode.SUBTRACT)

    # F4_s52 → F4_t51 (cut)
    with BuildSketch(Plane.XZ.offset(17.4)):
        with BuildLine():
            ThreePointArc((-35.2, 15), (-36.967766953, 14.267766953), (-37.7, 12.5))
            Line((-37.7, 12.5), (-37.7, 15))
            Line((-37.7, 15), (-35.2, 15))
        make_face()
    extrude(amount=F4_T51_DEPTH, mode=Mode.SUBTRACT)


with BuildPart() as f4_tool54:
    # F4_s55 → F4_t56 (new body)
    with BuildSketch(Plane.XZ.offset(27.55)):
        with Locations((36.475, -1.775)):
            Rectangle(F4_S55_W, F4_S55_H)
    extrude(amount=F4_T56_DEPTH)

    # F4_s57 → F4_t58 (revolve, cut)
    with BuildSketch(Plane(origin=(35.2, -27.55, -0.5), x_dir=(-0.7071067812, 0, 0.7071067812), z_dir=(0.7071067812, 0, 0.7071067812))):
        with BuildLine():
            ThreePointArc((0, -2.5), (2.5, 0), (0, 2.5))
            Line((0, 2.5), (0, -2.5))
        make_face()
    revolve(axis=Axis((35.2, -27.55, -0.5), (0, -1, 0)), mode=Mode.SUBTRACT)


with BuildPart() as f1_4:
    add(f1_3.part)

    # F4_t53: cut F4_tool54
    add(f4_tool54.part, mode=Mode.SUBTRACT)


with BuildPart() as f4_tool60:
    # F4_s61 → F4_t62 (new body)
    with BuildSketch(Plane.XZ.offset(27.55)):
        with Locations((36.475, 13.775)):
            Rectangle(F4_S61_W, F4_S61_H)
    extrude(amount=F4_T62_DEPTH)

    # F4_s63 → F4_t64 (revolve, cut)
    with BuildSketch(Plane(origin=(35.2, -27.55, 12.5), x_dir=(-0.7071067812, 0, -0.7071067812), z_dir=(-0.7071067812, 0, 0.7071067812))):
        with BuildLine():
            ThreePointArc((0, -2.5), (2.5, 0), (0, 2.5))
            Line((0, 2.5), (0, -2.5))
        make_face()
    revolve(axis=Axis((35.2, -27.55, 12.5), (0, -1, 0)), mode=Mode.SUBTRACT)


with BuildPart() as f1_5:
    add(f1_4.part)

    # F4_t59: cut F4_tool60
    add(f4_tool60.part, mode=Mode.SUBTRACT)


with BuildPart() as f4_tool66:
    # F4_s67 → F4_t68 (new body)
    with BuildSketch(Plane.XY.offset(-0.5)):
        with Locations((36.475, 28.825)):
            Rectangle(F4_S67_W, F4_S67_H)
    extrude(amount=-F4_T68_DEPTH)

    # F4_s69 → F4_t70 (revolve, cut)
    with BuildSketch(Plane(origin=(35.2, 27.55, -0.5), x_dir=(-0.7071067812, -0.7071067812, 0), z_dir=(0.7071067812, -0.7071067812, 0))):
        with BuildLine():
            ThreePointArc((0, -2.5), (2.5, 0), (0, 2.5))
            Line((0, 2.5), (0, -2.5))
        make_face()
    revolve(axis=Axis((35.2, 27.55, -0.5), (0, 0, -1)), mode=Mode.SUBTRACT)


with BuildPart() as f1_6:
    add(f1_5.part)

    # F4_t65: cut F4_tool66
    add(f4_tool66.part, mode=Mode.SUBTRACT)


with BuildPart() as f4_tool72:
    # F4_s73 → F4_t74 (new body)
    with BuildSketch(Plane.YZ.offset(35.2)):
        with Locations((28.825, 13.775)):
            Rectangle(F4_S73_W, F4_S73_H)
    extrude(amount=F4_T74_DEPTH)

    # F4_s75 → F4_t76 (revolve, cut)
    with BuildSketch(Plane(origin=(35.2, 27.55, 12.5), x_dir=(0, -0.7071067812, -0.7071067812), z_dir=(0, -0.7071067812, 0.7071067812))):
        with BuildLine():
            ThreePointArc((0, -2.5), (2.5, 0), (0, 2.5))
            Line((0, 2.5), (0, -2.5))
        make_face()
    revolve(axis=Axis((35.2, 27.55, 12.5), (1, 0, 0)), mode=Mode.SUBTRACT)


with BuildPart() as f1_7:
    add(f1_6.part)

    # F4_t71: cut F4_tool72
    add(f4_tool72.part, mode=Mode.SUBTRACT)


with BuildPart() as f4_tool78:
    # F4_s79 → F4_t80 (new body)
    with BuildSketch(Plane.XY.offset(12.5)):
        with Locations((-36.475, 28.825)):
            Rectangle(F4_S79_W, F4_S79_H)
    extrude(amount=F4_T80_DEPTH)

    # F4_s81 → F4_t82 (revolve, cut)
    with BuildSketch(Plane(origin=(-35.2, 27.55, 12.5), x_dir=(0.7071067812, -0.7071067812, 0), z_dir=(-0.7071067812, -0.7071067812, 0))):
        with BuildLine():
            ThreePointArc((0, -2.5), (2.5, 0), (0, 2.5))
            Line((0, 2.5), (0, -2.5))
        make_face()
    revolve(axis=Axis((-35.2, 27.55, 12.5), (0, 0, 1)), mode=Mode.SUBTRACT)


with BuildPart() as f1_8:
    add(f1_7.part)

    # F4_t77: cut F4_tool78
    add(f4_tool78.part, mode=Mode.SUBTRACT)


with BuildPart() as f4_tool84:
    # F4_s85 → F4_t86 (new body)
    with BuildSketch(Plane.XY.offset(-0.5)):
        with Locations((-36.475, 28.825)):
            Rectangle(F4_S85_W, F4_S85_H)
    extrude(amount=-F4_T86_DEPTH)

    # F4_s87 → F4_t88 (revolve, cut)
    with BuildSketch(Plane(origin=(-35.2, 27.55, -0.5), x_dir=(0.7071067812, -0.7071067812, 0), z_dir=(0.7071067812, 0.7071067812, 0))):
        with BuildLine():
            ThreePointArc((0, -2.5), (2.5, 0), (0, 2.5))
            Line((0, 2.5), (0, -2.5))
        make_face()
    revolve(axis=Axis((-35.2, 27.55, -0.5), (0, 0, -1)), mode=Mode.SUBTRACT)


with BuildPart() as f1_9:
    add(f1_8.part)

    # F4_t83: cut F4_tool84
    add(f4_tool84.part, mode=Mode.SUBTRACT)


with BuildPart() as f4_tool90:
    # F4_s91 → F4_t92 (new body)
    with BuildSketch(Plane.XZ.offset(27.55)):
        with Locations((-36.475, 13.775)):
            Rectangle(F4_S91_W, F4_S91_H)
    extrude(amount=F4_T92_DEPTH)

    # F4_s93 → F4_t94 (revolve, cut)
    with BuildSketch(Plane(origin=(-35.2, -27.55, 12.5), x_dir=(0.7071067812, 0, -0.7071067812), z_dir=(-0.7071067812, 0, -0.7071067812))):
        with BuildLine():
            ThreePointArc((0, -2.5), (2.5, 0), (0, 2.5))
            Line((0, 2.5), (0, -2.5))
        make_face()
    revolve(axis=Axis((-35.2, -27.55, 12.5), (0, -1, 0)), mode=Mode.SUBTRACT)


with BuildPart() as f1_10:
    add(f1_9.part)

    # F4_t89: cut F4_tool90
    add(f4_tool90.part, mode=Mode.SUBTRACT)


with BuildPart() as f4_tool96:
    # F4_s97 → F4_t98 (new body)
    with BuildSketch(Plane.XZ.offset(27.55)):
        with Locations((-36.475, -1.775)):
            Rectangle(F4_S97_W, F4_S97_H)
    extrude(amount=F4_T98_DEPTH)

    # F4_s99 → F4_t100 (revolve, cut)
    with BuildSketch(Plane(origin=(-35.2, -27.55, -0.5), x_dir=(0.7071067812, 0, 0.7071067812), z_dir=(0.7071067812, 0, -0.7071067812))):
        with BuildLine():
            ThreePointArc((0, -2.5), (2.5, 0), (0, 2.5))
            Line((0, 2.5), (0, -2.5))
        make_face()
    revolve(axis=Axis((-35.2, -27.55, -0.5), (0, -1, 0)), mode=Mode.SUBTRACT)


with BuildPart() as f1_11:
    add(f1_10.part)

    # F4_t95: cut F4_tool96
    add(f4_tool96.part, mode=Mode.SUBTRACT)


with BuildPart() as f4_tool103:
    # F4_s104 → F4_t105 (new body)
    with BuildSketch(Plane.XZ.offset(7.9)):
        with BuildLine():
            ThreePointArc((-37.7, -2.5), (-36.967766953, -0.732233047), (-35.2, 0))
            Line((-35.2, 0), (-37.7, 0))
            Line((-37.7, 0), (-37.7, -2.5))
        make_face()
    extrude(amount=F4_T105_DEPTH)

    split(bisect_by=Plane.XZ.offset(14.15), keep=Keep.BOTTOM)


with BuildPart() as f4_tool107:
    # F4_s108 → F4_t109 (new body)
    with BuildSketch(Plane.XY.offset(-6.25)):
        with BuildLine():
            ThreePointArc((-37.7, -11.65), (-36.967766953, -13.417766953), (-35.2, -14.15))
            Line((-35.2, -14.15), (-37.7, -14.15))
            Line((-37.7, -14.15), (-37.7, -11.65))
        make_face()
    extrude(amount=F4_T109_DEPTH)

    split(bisect_by=Plane.XY.offset(-3), keep=Keep.TOP)

    split(bisect_by=Plane.XY, keep=Keep.BOTTOM)


with BuildPart() as f4_tool103_1:
    add(f4_tool103.part)

    # F4_t112: intersect F4_tool107
    add(f4_tool107.part, mode=Mode.INTERSECT)


with BuildPart() as f1_12:
    add(f1_11.part)

    # F4_t101: cut F4_tool103
    add(f4_tool103_1.part, mode=Mode.SUBTRACT)


with BuildPart() as f4_tool115:
    # F4_s116 → F4_t117 (new body)
    with BuildSketch(Plane.XZ.offset(-23.6)):
        with BuildLine():
            ThreePointArc((-37.7, -2.5), (-36.967766953, -0.732233047), (-35.2, 0))
            Line((-35.2, 0), (-37.7, 0))
            Line((-37.7, 0), (-37.7, -2.5))
        make_face()
    extrude(amount=F4_T117_DEPTH)

    split(bisect_by=Plane.XZ.offset(-17.35), keep=Keep.BOTTOM)


with BuildPart() as f4_tool119:
    # F4_s120 → F4_t121 (new body)
    with BuildSketch(Plane.XY.offset(-6.25)):
        with BuildLine():
            ThreePointArc((-37.7, 19.85), (-36.967766953, 18.082233047), (-35.2, 17.35))
            Line((-35.2, 17.35), (-37.7, 17.35))
            Line((-37.7, 17.35), (-37.7, 19.85))
        make_face()
    extrude(amount=F4_T121_DEPTH)

    split(bisect_by=Plane.XY.offset(-3), keep=Keep.TOP)

    split(bisect_by=Plane.XY, keep=Keep.BOTTOM)


with BuildPart() as f4_tool115_1:
    add(f4_tool115.part)

    # F4_t124: intersect F4_tool119
    add(f4_tool119.part, mode=Mode.INTERSECT)


with BuildPart() as f1_13:
    add(f1_12.part)

    # F4_t113: cut F4_tool115
    add(f4_tool115_1.part, mode=Mode.SUBTRACT)


with BuildPart() as f4_tool127:
    # F4_s128 → F4_t129 (new body)
    with BuildSketch(Plane.XY.offset(-6.25)):
        with BuildLine():
            ThreePointArc((-37.7, 2.25), (-36.967766953, 4.017766953), (-35.2, 4.75))
            Line((-35.2, 4.75), (-37.7, 4.75))
            Line((-37.7, 4.75), (-37.7, 2.25))
        make_face()
    extrude(amount=F4_T129_DEPTH)

    split(bisect_by=Plane.XY.offset(-3), keep=Keep.TOP)

    split(bisect_by=Plane.XY, keep=Keep.BOTTOM)


with BuildPart() as f4_tool132:
    # F4_s133 → F4_t134 (new body)
    with BuildSketch(Plane.XZ.offset(-17.35)):
        with BuildLine():
            ThreePointArc((-37.7, -2.5), (-36.967766953, -0.732233047), (-35.2, 0))
            Line((-35.2, 0), (-37.7, 0))
            Line((-37.7, 0), (-37.7, -2.5))
        make_face()
    extrude(amount=F4_T134_DEPTH)

    split(bisect_by=Plane.XZ.offset(-4.75), keep=Keep.TOP)


with BuildPart() as f4_tool127_1:
    add(f4_tool127.part)

    # F4_t136: intersect F4_tool132
    add(f4_tool132.part, mode=Mode.INTERSECT)


with BuildPart() as f1_14:
    add(f1_13.part)

    # F4_t125: cut F4_tool127
    add(f4_tool127_1.part, mode=Mode.SUBTRACT)


with BuildPart() as f4_tool139:
    # F4_s140 → F4_t141 (new body)
    with BuildSketch(Plane.XY.offset(-6.25)):
        with BuildLine():
            ThreePointArc((-37.7, -26.15), (-36.967766953, -24.382233047), (-35.2, -23.65))
            Line((-35.2, -23.65), (-37.7, -23.65))
            Line((-37.7, -23.65), (-37.7, -26.15))
        make_face()
    extrude(amount=F4_T141_DEPTH)

    split(bisect_by=Plane.XY.offset(-3), keep=Keep.TOP)

    split(bisect_by=Plane.XY, keep=Keep.BOTTOM)


with BuildPart() as f4_tool144:
    # F4_s145 → F4_t146 (new body)
    with BuildSketch(Plane.XZ.offset(14.15)):
        with BuildLine():
            ThreePointArc((-37.7, -2.5), (-36.967766953, -0.732233047), (-35.2, 0))
            Line((-35.2, 0), (-37.7, 0))
            Line((-37.7, 0), (-37.7, -2.5))
        make_face()
    extrude(amount=F4_T146_DEPTH)

    split(bisect_by=Plane.XZ.offset(23.65), keep=Keep.TOP)


with BuildPart() as f4_tool139_1:
    add(f4_tool139.part)

    # F4_t148: intersect F4_tool144
    add(f4_tool144.part, mode=Mode.INTERSECT)


with BuildPart() as f1_15:
    add(f1_14.part)

    # F4_t137: cut F4_tool139
    add(f4_tool139_1.part, mode=Mode.SUBTRACT)


solid = f1_15.part
